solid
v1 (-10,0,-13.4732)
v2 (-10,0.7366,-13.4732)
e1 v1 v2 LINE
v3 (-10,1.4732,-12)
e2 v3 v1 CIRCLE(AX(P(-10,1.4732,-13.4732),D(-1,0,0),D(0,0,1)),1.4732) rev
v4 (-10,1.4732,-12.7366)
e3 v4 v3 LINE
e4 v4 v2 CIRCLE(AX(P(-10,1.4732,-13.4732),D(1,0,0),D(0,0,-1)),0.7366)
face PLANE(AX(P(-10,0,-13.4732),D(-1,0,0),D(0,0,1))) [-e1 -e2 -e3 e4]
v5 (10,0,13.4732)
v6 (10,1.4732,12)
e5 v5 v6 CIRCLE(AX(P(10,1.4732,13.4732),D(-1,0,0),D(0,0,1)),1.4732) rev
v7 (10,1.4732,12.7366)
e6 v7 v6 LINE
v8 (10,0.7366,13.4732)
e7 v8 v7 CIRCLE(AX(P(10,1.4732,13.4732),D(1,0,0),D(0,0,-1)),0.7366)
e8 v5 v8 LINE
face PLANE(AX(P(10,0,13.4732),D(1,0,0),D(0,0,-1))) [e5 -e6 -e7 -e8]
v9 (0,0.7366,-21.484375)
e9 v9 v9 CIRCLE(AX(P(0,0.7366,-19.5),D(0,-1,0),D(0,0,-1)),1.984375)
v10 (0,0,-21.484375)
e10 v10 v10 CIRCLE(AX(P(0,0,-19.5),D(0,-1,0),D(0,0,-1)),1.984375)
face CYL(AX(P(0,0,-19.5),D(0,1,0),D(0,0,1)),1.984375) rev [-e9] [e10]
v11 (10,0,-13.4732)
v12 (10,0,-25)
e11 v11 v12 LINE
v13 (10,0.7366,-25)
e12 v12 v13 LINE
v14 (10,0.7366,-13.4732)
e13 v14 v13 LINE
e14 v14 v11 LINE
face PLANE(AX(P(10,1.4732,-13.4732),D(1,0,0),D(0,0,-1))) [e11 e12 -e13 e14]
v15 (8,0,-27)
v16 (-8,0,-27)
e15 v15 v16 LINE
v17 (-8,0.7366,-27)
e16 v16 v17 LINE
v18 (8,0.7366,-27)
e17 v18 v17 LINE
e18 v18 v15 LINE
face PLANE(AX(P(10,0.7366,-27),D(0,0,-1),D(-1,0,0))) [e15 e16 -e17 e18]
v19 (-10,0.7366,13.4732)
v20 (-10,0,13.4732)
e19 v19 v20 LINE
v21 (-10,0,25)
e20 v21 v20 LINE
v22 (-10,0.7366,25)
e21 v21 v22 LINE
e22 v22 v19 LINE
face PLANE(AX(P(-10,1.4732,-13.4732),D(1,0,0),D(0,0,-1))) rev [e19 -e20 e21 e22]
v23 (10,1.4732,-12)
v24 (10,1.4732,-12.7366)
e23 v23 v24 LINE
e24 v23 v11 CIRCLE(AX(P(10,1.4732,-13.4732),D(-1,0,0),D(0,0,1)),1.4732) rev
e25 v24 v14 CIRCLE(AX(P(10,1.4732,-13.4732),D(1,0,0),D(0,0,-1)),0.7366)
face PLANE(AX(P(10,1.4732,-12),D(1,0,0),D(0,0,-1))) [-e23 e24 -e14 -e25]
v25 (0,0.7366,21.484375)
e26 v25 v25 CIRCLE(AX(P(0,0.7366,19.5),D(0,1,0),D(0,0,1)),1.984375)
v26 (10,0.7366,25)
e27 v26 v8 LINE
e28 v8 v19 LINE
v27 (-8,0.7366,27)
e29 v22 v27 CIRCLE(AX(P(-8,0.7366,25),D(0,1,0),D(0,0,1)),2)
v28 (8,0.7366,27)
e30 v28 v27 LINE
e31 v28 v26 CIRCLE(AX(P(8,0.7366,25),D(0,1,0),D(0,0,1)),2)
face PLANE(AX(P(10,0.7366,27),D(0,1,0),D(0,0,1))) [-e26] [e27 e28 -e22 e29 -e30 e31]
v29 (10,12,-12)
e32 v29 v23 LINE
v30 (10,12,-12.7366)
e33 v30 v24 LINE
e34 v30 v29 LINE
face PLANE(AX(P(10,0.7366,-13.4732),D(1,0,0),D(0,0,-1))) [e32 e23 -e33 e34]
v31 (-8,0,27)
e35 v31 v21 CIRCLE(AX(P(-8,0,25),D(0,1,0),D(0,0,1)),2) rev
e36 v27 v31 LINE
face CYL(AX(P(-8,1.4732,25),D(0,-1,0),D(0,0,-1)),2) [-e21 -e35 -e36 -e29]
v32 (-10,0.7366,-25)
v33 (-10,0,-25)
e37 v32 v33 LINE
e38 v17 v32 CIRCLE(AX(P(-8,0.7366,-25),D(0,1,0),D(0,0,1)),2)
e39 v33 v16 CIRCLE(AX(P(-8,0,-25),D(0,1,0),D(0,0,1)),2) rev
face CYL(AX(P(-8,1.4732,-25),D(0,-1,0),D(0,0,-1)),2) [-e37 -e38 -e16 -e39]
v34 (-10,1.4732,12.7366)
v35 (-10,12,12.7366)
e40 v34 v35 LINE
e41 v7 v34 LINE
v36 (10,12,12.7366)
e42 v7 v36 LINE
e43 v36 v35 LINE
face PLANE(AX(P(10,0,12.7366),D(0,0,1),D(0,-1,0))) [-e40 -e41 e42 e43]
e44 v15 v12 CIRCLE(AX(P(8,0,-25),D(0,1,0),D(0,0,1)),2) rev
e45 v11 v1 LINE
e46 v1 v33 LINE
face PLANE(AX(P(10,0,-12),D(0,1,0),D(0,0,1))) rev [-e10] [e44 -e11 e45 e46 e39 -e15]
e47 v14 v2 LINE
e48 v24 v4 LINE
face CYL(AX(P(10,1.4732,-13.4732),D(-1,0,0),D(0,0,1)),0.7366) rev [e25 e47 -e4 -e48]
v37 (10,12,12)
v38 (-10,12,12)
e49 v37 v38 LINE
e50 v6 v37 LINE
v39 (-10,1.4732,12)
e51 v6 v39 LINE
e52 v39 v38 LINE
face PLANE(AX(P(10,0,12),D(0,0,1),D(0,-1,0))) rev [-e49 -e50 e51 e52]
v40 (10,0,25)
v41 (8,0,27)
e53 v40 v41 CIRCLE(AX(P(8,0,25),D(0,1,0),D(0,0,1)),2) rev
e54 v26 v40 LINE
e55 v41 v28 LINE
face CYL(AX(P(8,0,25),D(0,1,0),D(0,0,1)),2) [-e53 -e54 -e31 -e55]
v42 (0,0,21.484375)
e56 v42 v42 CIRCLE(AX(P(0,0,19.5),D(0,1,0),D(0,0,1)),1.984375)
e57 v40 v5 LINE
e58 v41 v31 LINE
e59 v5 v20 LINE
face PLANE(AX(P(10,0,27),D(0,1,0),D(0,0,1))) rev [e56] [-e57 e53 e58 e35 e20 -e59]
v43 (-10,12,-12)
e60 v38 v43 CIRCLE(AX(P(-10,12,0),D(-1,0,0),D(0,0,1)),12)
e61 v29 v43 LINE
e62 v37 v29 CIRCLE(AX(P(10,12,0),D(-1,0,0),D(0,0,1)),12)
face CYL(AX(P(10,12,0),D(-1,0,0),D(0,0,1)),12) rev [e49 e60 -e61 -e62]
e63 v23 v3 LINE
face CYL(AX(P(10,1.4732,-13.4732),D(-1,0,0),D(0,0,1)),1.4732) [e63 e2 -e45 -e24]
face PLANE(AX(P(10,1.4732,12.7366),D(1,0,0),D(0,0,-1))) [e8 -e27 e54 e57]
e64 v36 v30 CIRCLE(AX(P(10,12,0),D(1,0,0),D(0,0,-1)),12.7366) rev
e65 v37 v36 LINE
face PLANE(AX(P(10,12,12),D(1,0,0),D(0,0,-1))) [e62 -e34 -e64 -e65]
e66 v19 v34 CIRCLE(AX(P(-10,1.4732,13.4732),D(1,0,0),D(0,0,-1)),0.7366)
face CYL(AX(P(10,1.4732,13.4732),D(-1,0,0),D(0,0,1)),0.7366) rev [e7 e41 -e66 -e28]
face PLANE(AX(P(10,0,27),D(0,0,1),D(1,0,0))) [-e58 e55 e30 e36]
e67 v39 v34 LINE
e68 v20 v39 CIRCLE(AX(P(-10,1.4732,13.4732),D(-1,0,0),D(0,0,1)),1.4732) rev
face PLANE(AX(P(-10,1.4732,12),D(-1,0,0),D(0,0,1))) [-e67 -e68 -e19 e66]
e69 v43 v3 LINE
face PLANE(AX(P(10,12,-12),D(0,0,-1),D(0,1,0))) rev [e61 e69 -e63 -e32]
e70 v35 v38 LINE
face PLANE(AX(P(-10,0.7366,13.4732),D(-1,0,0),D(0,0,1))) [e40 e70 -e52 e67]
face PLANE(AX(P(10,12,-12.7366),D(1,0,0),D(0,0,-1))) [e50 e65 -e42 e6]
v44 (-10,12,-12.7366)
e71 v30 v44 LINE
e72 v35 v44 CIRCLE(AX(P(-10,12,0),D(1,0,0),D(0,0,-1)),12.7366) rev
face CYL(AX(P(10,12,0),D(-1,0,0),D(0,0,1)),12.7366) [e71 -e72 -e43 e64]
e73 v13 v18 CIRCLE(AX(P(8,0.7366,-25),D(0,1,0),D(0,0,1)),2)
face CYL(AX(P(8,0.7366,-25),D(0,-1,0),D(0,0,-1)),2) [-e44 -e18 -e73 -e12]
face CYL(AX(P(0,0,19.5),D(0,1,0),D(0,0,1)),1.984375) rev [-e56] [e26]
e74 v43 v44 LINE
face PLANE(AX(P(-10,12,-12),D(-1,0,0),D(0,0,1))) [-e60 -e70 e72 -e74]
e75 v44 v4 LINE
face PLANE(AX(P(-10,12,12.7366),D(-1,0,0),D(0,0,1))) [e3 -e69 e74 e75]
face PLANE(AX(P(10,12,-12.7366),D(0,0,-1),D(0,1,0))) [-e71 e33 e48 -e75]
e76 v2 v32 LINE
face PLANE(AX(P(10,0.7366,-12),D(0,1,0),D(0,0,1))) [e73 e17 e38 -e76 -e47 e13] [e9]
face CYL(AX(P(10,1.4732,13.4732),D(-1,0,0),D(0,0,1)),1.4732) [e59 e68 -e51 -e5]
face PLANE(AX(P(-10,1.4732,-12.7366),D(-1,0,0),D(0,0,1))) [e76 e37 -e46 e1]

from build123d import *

# Parameters (mm, degrees)
BASE_FLANGE1_DEPTH = 10
SKETCH6_R          = 1.984375
CUT_EXTRUDE1_DEPTH = 38.483329628
FILLET1_R          = 2
FILLET2_R          = 2
FILLET3_R          = 2


# Sheet-metal steps are written as plain solids
with BuildPart() as part:
    # Sketch1 → Base-Flange1 (new, symmetric)
    with BuildSketch(Plane(origin=(0, 0, 0), x_dir=(0, 0, -1), z_dir=(1, 0, 0))):
        with BuildLine():
            Line((-27, 0), (-13.4732, 0))
            ThreePointArc((-13.4732, 0), (-12.43149029, 0.43149029), (-12, 1.4732))
            Line((-12, 1.4732), (-12, 12))
            ThreePointArc((-12, 12), (0, 24), (12, 12))
            Line((12, 12), (12, 1.4732))
            ThreePointArc((12, 1.4732), (12.43149029, 0.43149029), (13.4732, 0))
            Line((13.4732, 0), (27, 0))
            Line((27, 0), (27, 0.7366))
            Line((27, 0.7366), (13.4732, 0.7366))
            ThreePointArc((13.4732, 0.7366), (12.952345145, 0.952345145), (12.7366, 1.4732))
            Line((12.7366, 1.4732), (12.7366, 12))
            ThreePointArc((12.7366, 12), (0, 24.7366), (-12.7366, 12))
            Line((-12.7366, 12), (-12.7366, 1.4732))
            ThreePointArc((-12.7366, 1.4732), (-12.952345145, 0.952345145), (-13.4732, 0.7366))
            Line((-13.4732, 0.7366), (-27, 0.7366))
            Line((-27, 0.7366), (-27, 0))
        make_face()
    extrude(amount=BASE_FLANGE1_DEPTH, both=True)

    # Sketch6 → Cut-Extrude1 (cut, through all)
    with BuildSketch(Plane(origin=(0, 0.7366, 0), x_dir=(1, 0, 0), z_dir=(0, 1, 0))):
        with Locations(Location((0, -19.5, 0), (0, 0, 270))):
            Circle(SKETCH6_R)
    cut_extrude1 = extrude(amount=-CUT_EXTRUDE1_DEPTH, mode=Mode.SUBTRACT)

    # Mirror1: Cut-Extrude1 across plane
    add(cut_extrude1.mirror(Plane.XY), mode=Mode.SUBTRACT)

    # Fillet1
    fillet1_edges = [part.edges().sort_by_distance(p)[0] for p in [
        (10, 0.3683, -27),
    ]]
    fillet(fillet1_edges, radius=FILLET1_R)

    # Fillet2
    fillet2_edges = [part.edges().sort_by_distance(p)[0] for p in [
        (-10, 0.3683, -27),
    ]]
    fillet(fillet2_edges, radius=FILLET2_R)

    # Fillet3
    fillet3_edges = [part.edges().sort_by_distance(p)[0] for p in [
        (-10, 0.3683, 27),
        (10, 0.3683, 27),
    ]]
    fillet(fillet3_edges, radius=FILLET3_R)


solid = part.part
